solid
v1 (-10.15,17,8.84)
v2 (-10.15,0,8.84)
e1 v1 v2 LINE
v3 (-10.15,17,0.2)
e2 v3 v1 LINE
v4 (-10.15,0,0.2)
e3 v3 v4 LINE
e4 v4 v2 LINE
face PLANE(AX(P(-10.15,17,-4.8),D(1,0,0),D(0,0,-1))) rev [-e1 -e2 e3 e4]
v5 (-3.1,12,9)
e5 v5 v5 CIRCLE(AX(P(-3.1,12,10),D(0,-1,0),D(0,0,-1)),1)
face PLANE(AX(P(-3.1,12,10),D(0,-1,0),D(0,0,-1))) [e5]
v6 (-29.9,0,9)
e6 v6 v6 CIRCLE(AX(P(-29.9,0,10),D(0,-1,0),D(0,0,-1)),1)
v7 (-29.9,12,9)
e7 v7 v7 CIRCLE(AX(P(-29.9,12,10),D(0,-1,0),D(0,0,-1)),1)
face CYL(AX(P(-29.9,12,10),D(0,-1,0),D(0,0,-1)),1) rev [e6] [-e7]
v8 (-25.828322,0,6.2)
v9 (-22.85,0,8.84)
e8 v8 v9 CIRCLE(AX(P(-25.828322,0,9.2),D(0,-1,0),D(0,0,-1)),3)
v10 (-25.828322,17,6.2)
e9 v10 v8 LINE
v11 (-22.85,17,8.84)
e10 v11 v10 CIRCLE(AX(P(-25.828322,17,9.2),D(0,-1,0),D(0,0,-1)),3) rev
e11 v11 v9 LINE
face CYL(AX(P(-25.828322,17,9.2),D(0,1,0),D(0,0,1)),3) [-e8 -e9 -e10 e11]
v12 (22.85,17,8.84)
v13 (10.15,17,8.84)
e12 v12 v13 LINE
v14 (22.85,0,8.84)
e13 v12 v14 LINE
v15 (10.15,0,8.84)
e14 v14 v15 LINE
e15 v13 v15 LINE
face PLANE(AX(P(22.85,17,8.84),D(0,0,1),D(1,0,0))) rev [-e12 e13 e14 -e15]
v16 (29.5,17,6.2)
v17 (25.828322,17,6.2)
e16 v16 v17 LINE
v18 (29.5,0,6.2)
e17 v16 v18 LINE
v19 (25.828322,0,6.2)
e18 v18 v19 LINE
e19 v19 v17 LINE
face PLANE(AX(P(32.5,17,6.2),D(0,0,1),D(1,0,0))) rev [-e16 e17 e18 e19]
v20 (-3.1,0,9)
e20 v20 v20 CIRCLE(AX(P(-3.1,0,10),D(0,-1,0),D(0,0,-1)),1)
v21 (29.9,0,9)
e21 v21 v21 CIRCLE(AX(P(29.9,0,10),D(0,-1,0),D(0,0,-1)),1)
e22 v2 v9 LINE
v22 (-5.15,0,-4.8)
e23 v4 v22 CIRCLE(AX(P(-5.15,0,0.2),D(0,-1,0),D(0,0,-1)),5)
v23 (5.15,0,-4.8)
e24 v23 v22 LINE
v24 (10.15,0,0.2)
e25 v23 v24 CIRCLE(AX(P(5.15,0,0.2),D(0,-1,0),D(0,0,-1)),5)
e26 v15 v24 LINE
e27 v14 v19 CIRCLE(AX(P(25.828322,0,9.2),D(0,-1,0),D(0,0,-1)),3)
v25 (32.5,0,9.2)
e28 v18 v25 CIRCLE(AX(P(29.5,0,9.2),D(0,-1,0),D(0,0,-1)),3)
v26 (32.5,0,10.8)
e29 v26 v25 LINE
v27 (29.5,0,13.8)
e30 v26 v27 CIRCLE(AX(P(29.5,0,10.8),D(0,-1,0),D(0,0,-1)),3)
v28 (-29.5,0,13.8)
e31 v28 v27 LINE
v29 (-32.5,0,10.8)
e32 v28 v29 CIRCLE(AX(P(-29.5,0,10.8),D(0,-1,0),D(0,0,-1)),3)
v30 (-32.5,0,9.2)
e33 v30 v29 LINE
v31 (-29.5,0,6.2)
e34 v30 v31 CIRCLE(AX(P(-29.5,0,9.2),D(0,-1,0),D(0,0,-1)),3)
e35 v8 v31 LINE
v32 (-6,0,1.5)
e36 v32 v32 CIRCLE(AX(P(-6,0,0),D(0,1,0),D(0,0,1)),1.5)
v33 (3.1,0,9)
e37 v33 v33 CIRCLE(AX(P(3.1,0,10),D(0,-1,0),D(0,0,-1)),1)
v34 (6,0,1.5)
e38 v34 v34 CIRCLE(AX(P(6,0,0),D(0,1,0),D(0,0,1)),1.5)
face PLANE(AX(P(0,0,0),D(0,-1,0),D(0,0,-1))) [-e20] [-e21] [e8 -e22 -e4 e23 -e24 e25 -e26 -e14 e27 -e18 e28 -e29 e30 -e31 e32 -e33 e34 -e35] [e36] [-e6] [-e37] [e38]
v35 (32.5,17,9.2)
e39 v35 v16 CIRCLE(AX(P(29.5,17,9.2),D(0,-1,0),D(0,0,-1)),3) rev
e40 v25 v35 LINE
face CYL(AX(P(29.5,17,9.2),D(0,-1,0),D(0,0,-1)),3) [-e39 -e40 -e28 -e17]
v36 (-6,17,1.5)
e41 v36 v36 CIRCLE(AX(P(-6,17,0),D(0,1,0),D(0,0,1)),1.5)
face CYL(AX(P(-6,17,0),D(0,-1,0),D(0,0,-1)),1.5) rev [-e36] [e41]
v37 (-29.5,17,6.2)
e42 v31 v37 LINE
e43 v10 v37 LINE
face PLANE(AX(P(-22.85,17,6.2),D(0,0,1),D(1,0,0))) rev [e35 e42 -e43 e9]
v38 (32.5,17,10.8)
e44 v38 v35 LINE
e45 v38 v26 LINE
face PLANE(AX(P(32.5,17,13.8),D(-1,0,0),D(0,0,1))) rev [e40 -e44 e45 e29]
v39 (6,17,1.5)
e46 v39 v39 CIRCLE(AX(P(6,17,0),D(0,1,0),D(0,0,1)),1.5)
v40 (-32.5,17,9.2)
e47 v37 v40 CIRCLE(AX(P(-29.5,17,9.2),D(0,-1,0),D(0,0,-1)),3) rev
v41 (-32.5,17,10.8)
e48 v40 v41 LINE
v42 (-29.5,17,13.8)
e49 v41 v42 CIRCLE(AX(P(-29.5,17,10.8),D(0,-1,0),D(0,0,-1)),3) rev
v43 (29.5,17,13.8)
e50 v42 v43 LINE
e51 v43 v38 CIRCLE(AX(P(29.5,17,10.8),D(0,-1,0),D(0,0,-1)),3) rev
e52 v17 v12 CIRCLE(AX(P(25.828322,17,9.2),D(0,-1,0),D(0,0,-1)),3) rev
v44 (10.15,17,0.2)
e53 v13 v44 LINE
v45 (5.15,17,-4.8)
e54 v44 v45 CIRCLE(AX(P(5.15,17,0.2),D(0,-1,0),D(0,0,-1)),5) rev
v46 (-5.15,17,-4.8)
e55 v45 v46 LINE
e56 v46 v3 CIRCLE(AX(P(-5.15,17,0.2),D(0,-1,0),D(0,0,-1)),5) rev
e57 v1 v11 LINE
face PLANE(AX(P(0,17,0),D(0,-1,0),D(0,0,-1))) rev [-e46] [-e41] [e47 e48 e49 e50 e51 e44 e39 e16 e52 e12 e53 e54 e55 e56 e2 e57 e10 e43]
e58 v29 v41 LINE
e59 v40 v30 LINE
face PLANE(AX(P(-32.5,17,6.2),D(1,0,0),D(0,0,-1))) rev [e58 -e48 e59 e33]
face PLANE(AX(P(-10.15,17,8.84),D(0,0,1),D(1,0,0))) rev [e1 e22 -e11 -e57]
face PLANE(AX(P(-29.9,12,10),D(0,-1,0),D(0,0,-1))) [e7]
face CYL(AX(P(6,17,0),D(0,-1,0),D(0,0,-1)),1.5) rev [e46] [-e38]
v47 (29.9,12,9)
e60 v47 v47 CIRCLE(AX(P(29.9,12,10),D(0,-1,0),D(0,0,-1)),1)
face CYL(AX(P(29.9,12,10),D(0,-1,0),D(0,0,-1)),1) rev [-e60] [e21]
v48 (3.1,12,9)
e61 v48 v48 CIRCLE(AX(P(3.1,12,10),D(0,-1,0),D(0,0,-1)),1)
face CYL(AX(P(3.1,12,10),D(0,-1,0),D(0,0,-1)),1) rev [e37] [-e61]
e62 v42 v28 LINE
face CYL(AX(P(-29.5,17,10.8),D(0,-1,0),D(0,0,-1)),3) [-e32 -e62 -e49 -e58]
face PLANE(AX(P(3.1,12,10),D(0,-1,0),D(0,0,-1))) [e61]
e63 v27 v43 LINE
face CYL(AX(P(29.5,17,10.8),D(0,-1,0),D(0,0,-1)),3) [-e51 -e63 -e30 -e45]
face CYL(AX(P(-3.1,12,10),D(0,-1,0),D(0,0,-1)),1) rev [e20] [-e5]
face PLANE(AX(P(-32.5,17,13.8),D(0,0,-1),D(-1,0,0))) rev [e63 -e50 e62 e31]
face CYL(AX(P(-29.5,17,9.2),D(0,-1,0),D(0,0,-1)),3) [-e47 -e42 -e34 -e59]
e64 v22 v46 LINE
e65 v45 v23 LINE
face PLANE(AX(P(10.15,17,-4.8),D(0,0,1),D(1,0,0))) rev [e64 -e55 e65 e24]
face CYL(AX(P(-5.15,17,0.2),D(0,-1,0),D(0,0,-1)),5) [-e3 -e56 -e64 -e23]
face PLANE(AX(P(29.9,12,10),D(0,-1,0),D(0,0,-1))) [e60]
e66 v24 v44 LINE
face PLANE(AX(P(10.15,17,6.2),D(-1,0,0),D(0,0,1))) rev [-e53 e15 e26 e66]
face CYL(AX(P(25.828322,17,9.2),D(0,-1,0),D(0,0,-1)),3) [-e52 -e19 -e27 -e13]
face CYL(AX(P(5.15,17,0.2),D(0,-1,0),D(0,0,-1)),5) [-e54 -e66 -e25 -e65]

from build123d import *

# Parameters (mm, degrees)
SKETCH1_R           = 1.5
BOSS_EXTRUDE1_DEPTH = 17
SKETCH2_R           = 1
CUT_EXTRUDE1_DEPTH  = 12
FILLET2_R           = 5
FILLET3_R           = 3


with BuildPart() as part:
    # Sketch1 → Boss-Extrude1 (new body)
    with BuildSketch(Plane(origin=(0, 0, 0), x_dir=(1, 0, 0), z_dir=(0, 1, 0))):
        Polygon((-32.5, -13.8), (32.5, -13.8), (32.5, -6.2), (22.85, -6.2), (22.85, -8.84), (10.15, -8.84), (10.15, -6.2), (10.15, 4.8), (-10.15, 4.8), (-10.15, -8.84), (-22.85, -8.84), (-22.85, -6.2), (-32.5, -6.2), align=None)
        with Locations(Location((-6, 0, 0), (0, 0, 270))):
            Circle(SKETCH1_R, mode=Mode.SUBTRACT)
        with Locations(Location((6, 0, 0), (0, 0, 270))):
            Circle(SKETCH1_R, mode=Mode.SUBTRACT)
    extrude(amount=BOSS_EXTRUDE1_DEPTH)

    # Sketch2 → Cut-Extrude1 (cut)
    with BuildSketch(Plane.XZ):
        with Locations(Location((-3.1, 10, 0), (0, 0, 270))):
            Circle(SKETCH2_R)
        with Locations(Location((-29.9, 10, 0), (0, 0, 270))):
            Circle(SKETCH2_R)
        with Locations(Location((3.1, 10, 0), (0, 0, 270))):
            Circle(SKETCH2_R)
        with Locations(Location((29.9, 10, 0), (0, 0, 270))):
            Circle(SKETCH2_R)
    extrude(amount=-CUT_EXTRUDE1_DEPTH, mode=Mode.SUBTRACT)

    # Fillet2
    fillet2_edges = [part.edges().sort_by_distance(p)[0] for p in [
        (-10.15, 8.5, -4.8),
        (10.15, 8.5, -4.8),
    ]]
    fillet(fillet2_edges, radius=FILLET2_R)

    # Fillet3
    # the kernel refuses this fillet: 3 mm, written as the material it takes off along each edge
    with BuildSketch(Plane(origin=(-32.5, -7.5, 13.8), x_dir=(0, 0, -1), z_dir=(0, 1, 0)), Plane(origin=(32.5, -7.5, 13.8), x_dir=(-1, 0, 0), z_dir=(0, 1, 0)), Plane(origin=(32.5, -7.5, 6.2), x_dir=(0, 0, 1), z_dir=(0, 1, 0)), Plane(origin=(-32.5, -7.5, 6.2), x_dir=(1, 0, 0), z_dir=(0, 1, 0))) as fillet3_piece_1:
        with BuildLine():
            CenterArc((FILLET3_R, -FILLET3_R), FILLET3_R, 90, 90)
            Line((0, -FILLET3_R), (-FILLET3_R * 0.02, -FILLET3_R))
            Line((-FILLET3_R * 0.02, -FILLET3_R), (-FILLET3_R * 0.02, FILLET3_R * 0.02))
            Line((-FILLET3_R * 0.02, FILLET3_R * 0.02), (FILLET3_R, FILLET3_R * 0.02))
            Line((FILLET3_R, FILLET3_R * 0.02), (FILLET3_R, 0))
        make_face()
    extrude(amount=32, mode=Mode.SUBTRACT)
    with BuildSketch(Plane(origin=(22.85, -7.445804188, 6.2), x_dir=(0, 0, 1), z_dir=(0, 1, 0))) as fillet3_piece_2:
        with BuildLine():
            CenterArc((3, 2.978321675), FILLET3_R, 180, 83.107897421)
            Line((0, 2.978321675), (-0.06, 2.978321675))
            Line((-0.06, 2.978321675), (-0.06, 0))
            Line((-0.06, 0), (0, -0.06))
            ThreePointArc((0, -0.06), (1.32, -0.06), (2.6328, -0.059566434))
            Line((2.6328, -0.059566434), (2.64, 0))
        make_face()
    extrude(amount=31.891608375, mode=Mode.SUBTRACT)
    with BuildSketch(Plane(origin=(-22.85, -7.445804188, 6.2), x_dir=(0, 0, 1), z_dir=(0, 1, 0))) as fillet3_piece_3:
        with BuildLine():
            CenterArc((3, -2.978321675), FILLET3_R, 96.892102579, 83.107897421)
            Line((0, -2.978321675), (-0.06, -2.978321675))
            Line((-0.06, -2.978321675), (-0.06, 0))
            Line((-0.06, 0), (0, 0.06))
            ThreePointArc((0, 0.06), (1.32, 0.06), (2.6328, 0.059566434))
            Line((2.6328, 0.059566434), (2.64, 0))
        make_face()
    extrude(amount=31.891608375, mode=Mode.SUBTRACT)


solid = part.part
